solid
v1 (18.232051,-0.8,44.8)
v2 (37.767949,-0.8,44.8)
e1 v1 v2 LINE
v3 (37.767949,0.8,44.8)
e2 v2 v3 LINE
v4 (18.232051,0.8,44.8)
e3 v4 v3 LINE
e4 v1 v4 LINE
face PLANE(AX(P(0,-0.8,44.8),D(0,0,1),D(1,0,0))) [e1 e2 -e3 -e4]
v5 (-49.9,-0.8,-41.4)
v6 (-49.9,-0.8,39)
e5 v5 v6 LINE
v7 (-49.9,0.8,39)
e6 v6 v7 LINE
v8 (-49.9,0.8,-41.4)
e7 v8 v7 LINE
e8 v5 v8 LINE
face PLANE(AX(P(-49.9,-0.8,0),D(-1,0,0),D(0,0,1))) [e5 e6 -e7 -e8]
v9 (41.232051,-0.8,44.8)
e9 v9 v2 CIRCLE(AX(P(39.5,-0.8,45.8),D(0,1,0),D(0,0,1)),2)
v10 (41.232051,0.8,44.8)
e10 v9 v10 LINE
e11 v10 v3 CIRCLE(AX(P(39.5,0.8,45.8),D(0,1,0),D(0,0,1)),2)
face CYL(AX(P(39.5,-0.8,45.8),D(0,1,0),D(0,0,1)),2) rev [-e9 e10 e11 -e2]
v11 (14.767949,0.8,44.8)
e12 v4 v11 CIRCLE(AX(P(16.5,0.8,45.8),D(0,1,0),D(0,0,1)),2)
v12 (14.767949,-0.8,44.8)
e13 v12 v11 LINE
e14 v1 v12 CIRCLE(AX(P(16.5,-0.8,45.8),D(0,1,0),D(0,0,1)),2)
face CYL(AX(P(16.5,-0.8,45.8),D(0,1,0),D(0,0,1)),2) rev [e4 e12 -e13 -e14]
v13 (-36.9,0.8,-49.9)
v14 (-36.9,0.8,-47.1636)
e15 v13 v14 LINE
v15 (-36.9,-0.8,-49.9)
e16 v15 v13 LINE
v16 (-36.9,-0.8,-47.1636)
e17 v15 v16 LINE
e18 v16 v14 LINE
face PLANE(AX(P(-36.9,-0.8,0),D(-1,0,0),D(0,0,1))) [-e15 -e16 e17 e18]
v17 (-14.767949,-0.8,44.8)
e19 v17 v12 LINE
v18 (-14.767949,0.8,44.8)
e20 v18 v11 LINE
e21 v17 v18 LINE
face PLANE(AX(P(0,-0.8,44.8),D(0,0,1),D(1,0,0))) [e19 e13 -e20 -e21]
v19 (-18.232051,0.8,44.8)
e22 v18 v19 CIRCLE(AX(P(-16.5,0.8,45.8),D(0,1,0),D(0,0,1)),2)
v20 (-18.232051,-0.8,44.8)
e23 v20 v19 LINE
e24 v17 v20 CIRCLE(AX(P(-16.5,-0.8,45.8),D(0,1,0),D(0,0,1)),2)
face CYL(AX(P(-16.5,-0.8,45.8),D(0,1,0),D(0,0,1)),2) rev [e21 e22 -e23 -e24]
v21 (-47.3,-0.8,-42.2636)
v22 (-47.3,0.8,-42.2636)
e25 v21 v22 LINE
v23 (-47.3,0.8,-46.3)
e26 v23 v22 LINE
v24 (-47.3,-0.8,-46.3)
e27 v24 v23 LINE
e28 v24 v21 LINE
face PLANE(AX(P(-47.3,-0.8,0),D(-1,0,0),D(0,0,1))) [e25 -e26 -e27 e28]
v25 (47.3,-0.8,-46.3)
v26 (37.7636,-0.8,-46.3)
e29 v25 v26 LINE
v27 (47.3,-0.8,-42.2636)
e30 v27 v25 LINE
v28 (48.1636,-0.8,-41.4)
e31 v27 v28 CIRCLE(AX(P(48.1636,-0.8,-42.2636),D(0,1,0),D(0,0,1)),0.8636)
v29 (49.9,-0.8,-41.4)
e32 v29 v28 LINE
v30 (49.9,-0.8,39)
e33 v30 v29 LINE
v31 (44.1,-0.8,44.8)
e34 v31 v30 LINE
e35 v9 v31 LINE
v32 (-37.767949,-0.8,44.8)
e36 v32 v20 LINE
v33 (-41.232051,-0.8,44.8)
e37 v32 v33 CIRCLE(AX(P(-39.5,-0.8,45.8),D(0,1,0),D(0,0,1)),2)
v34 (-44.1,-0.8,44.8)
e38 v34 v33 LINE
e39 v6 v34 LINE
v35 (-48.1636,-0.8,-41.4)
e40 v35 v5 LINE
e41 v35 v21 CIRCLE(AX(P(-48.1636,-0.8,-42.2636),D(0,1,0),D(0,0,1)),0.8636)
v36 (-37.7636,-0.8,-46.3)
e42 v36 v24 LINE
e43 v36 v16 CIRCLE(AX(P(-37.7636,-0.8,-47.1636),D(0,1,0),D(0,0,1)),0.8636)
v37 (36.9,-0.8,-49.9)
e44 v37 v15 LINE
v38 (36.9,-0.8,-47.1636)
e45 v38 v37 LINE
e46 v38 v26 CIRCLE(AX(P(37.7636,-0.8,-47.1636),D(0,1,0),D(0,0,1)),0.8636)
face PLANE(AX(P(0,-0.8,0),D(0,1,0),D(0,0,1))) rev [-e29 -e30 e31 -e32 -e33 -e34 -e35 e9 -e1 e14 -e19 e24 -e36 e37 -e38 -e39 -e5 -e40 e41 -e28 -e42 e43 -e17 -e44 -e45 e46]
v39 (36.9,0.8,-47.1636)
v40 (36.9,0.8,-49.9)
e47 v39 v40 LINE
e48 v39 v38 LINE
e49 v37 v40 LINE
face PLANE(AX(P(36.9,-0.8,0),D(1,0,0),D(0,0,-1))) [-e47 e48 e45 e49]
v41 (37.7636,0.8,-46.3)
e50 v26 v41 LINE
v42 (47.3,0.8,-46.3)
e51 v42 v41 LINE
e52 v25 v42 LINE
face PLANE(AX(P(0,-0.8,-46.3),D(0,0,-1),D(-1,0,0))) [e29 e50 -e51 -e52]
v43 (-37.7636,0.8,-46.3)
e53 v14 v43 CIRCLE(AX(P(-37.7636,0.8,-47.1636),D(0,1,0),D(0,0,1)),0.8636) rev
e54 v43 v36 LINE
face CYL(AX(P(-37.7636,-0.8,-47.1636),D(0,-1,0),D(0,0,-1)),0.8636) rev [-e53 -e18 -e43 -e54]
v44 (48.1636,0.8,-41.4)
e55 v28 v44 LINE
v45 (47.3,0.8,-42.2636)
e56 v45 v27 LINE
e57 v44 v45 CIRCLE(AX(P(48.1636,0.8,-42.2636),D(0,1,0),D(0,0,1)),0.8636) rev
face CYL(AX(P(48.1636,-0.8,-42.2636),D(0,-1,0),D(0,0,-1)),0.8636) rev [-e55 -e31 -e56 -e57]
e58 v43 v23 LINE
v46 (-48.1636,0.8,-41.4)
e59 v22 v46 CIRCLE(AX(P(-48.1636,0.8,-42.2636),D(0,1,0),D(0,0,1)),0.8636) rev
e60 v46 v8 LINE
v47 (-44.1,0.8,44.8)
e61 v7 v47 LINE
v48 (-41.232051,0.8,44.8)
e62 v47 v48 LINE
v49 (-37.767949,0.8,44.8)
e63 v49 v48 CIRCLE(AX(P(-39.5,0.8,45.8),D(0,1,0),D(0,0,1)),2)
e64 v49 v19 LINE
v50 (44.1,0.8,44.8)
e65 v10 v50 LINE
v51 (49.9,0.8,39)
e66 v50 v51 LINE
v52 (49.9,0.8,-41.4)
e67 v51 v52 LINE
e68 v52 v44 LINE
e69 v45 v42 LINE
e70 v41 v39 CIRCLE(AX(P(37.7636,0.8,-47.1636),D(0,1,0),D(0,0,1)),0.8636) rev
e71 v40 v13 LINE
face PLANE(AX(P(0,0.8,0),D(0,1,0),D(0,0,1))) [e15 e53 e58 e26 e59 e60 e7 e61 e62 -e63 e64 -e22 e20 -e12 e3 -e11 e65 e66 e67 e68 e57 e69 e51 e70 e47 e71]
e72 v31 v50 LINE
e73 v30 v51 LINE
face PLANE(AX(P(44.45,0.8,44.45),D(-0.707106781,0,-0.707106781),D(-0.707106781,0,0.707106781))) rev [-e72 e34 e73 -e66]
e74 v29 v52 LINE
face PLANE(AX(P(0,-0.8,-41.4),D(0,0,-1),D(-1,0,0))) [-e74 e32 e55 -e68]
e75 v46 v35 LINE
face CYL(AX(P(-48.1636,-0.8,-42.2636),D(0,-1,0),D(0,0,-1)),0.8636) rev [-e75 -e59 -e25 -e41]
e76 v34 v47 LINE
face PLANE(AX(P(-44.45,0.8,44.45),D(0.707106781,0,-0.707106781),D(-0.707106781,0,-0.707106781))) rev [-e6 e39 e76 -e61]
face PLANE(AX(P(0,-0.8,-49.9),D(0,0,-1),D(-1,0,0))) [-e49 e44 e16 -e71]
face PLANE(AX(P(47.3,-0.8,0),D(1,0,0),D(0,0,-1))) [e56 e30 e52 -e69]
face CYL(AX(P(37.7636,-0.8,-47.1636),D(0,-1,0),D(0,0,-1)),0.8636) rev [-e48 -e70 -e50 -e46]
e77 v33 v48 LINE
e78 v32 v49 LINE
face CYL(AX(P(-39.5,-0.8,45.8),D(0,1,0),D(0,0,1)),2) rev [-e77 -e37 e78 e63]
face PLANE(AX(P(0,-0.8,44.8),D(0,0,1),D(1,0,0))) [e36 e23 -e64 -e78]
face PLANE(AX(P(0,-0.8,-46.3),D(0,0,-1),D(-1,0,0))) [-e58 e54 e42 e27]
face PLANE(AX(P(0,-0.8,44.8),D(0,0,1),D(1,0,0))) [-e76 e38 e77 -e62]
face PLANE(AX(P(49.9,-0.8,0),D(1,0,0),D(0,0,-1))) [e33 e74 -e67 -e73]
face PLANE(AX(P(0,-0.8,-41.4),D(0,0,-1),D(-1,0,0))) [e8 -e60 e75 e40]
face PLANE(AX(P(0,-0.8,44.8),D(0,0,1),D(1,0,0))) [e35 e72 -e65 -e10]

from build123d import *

# Parameters (mm, degrees)
GENERALSHAPE_DEPTH   = 0.8
ADDTOLERANCE_START   = -0.8
ADDTOLERANCE_DEPTH   = 1.6
BACKPLANE_DEPTH      = 71.573791169
BACKPLANE_DEPTH_BACK = 71.573791169
FILLET2_R            = 0.8636


# Read off the part's stored shape, not the designer's step: AddTolerance
with BuildPart() as part:
    # Sketch2 → GeneralShape (new, symmetric)
    with BuildSketch(Plane(origin=(0, 0, 0), x_dir=(1, 0, 0), z_dir=(0, 1, 0))):
        Polygon((47.4, 46.4), (37, 46.4), (37, 50), (-37, 50), (-37, 46.4), (-47.4, 46.4), (-47.4, 41.5), (-50, 41.5), (-50, -38.9), (-41.5, -47.4), (41.5, -47.4), (50, -38.9), (50, 41.5), (47.4, 41.5), align=None)
    extrude(amount=GENERALSHAPE_DEPTH, both=True)

    # AddTolerance outline → AddTolerance (cut)
    with BuildSketch(Plane(origin=(0, 0, 0), x_dir=(1, 0, 0), z_dir=(0, 1, 0)).offset(ADDTOLERANCE_START)):
        Polygon((49.9, 41.4), (49.9, -39), (50, -38.9), (50, 41.5), (47.4, 41.5), (47.4, 46.4), (37, 46.4), (37, 50), (-37, 50), (-37, 46.4), (-47.4, 46.4), (-47.4, 41.5), (-50, 41.5), (-50, -38.9), (-49.9, -39), (-49.9, 41.4), (-47.3, 41.4), (-47.3, 46.3), (-36.9, 46.3), (-36.9, 49.9), (36.9, 49.9), (36.9, 46.3), (47.3, 46.3), (47.3, 41.4), align=None)
    extrude(amount=ADDTOLERANCE_DEPTH, mode=Mode.SUBTRACT)

    # Sketch4 → Backplane (cut, two sides: drawn at the far end of the back side and taken through both)
    with BuildSketch(Plane(origin=(0, 0, 0), x_dir=(1, 0, 0), z_dir=(0, 1, 0)).offset(-BACKPLANE_DEPTH_BACK)):
        with BuildLine():
            Line((41.5, -47.4), (44.1, -44.8))
            Line((44.1, -44.8), (41.232050808, -44.8))
            ThreePointArc((41.232050808, -44.8), (39.5, -43.8), (37.767949192, -44.8))
            Line((37.767949192, -44.8), (18.232050808, -44.8))
            ThreePointArc((18.232050808, -44.8), (16.5, -43.8), (14.767949192, -44.8))
            Line((14.767949192, -44.8), (-14.767949192, -44.8))
            ThreePointArc((-14.767949192, -44.8), (-16.5, -43.8), (-18.232050808, -44.8))
            Line((-18.232050808, -44.8), (-37.767949192, -44.8))
            ThreePointArc((-37.767949192, -44.8), (-39.5, -43.8), (-41.232050808, -44.8))
            Line((-41.232050808, -44.8), (-44.1, -44.8))
            Line((-44.1, -44.8), (-41.5, -47.4))
            Line((-41.5, -47.4), (41.5, -47.4))
        make_face()
    extrude(amount=BACKPLANE_DEPTH + BACKPLANE_DEPTH_BACK, mode=Mode.SUBTRACT)

    # Fillet2
    fillet2_edges = [part.edges().sort_by_distance(p)[0] for p in [
        (47.3, 0, -41.4),
        (36.9, 0, -46.3),
        (-36.9, 0, -46.3),
        (-47.3, 0, -41.4),
    ]]
    fillet(fillet2_edges, radius=FILLET2_R)


solid = part.part
